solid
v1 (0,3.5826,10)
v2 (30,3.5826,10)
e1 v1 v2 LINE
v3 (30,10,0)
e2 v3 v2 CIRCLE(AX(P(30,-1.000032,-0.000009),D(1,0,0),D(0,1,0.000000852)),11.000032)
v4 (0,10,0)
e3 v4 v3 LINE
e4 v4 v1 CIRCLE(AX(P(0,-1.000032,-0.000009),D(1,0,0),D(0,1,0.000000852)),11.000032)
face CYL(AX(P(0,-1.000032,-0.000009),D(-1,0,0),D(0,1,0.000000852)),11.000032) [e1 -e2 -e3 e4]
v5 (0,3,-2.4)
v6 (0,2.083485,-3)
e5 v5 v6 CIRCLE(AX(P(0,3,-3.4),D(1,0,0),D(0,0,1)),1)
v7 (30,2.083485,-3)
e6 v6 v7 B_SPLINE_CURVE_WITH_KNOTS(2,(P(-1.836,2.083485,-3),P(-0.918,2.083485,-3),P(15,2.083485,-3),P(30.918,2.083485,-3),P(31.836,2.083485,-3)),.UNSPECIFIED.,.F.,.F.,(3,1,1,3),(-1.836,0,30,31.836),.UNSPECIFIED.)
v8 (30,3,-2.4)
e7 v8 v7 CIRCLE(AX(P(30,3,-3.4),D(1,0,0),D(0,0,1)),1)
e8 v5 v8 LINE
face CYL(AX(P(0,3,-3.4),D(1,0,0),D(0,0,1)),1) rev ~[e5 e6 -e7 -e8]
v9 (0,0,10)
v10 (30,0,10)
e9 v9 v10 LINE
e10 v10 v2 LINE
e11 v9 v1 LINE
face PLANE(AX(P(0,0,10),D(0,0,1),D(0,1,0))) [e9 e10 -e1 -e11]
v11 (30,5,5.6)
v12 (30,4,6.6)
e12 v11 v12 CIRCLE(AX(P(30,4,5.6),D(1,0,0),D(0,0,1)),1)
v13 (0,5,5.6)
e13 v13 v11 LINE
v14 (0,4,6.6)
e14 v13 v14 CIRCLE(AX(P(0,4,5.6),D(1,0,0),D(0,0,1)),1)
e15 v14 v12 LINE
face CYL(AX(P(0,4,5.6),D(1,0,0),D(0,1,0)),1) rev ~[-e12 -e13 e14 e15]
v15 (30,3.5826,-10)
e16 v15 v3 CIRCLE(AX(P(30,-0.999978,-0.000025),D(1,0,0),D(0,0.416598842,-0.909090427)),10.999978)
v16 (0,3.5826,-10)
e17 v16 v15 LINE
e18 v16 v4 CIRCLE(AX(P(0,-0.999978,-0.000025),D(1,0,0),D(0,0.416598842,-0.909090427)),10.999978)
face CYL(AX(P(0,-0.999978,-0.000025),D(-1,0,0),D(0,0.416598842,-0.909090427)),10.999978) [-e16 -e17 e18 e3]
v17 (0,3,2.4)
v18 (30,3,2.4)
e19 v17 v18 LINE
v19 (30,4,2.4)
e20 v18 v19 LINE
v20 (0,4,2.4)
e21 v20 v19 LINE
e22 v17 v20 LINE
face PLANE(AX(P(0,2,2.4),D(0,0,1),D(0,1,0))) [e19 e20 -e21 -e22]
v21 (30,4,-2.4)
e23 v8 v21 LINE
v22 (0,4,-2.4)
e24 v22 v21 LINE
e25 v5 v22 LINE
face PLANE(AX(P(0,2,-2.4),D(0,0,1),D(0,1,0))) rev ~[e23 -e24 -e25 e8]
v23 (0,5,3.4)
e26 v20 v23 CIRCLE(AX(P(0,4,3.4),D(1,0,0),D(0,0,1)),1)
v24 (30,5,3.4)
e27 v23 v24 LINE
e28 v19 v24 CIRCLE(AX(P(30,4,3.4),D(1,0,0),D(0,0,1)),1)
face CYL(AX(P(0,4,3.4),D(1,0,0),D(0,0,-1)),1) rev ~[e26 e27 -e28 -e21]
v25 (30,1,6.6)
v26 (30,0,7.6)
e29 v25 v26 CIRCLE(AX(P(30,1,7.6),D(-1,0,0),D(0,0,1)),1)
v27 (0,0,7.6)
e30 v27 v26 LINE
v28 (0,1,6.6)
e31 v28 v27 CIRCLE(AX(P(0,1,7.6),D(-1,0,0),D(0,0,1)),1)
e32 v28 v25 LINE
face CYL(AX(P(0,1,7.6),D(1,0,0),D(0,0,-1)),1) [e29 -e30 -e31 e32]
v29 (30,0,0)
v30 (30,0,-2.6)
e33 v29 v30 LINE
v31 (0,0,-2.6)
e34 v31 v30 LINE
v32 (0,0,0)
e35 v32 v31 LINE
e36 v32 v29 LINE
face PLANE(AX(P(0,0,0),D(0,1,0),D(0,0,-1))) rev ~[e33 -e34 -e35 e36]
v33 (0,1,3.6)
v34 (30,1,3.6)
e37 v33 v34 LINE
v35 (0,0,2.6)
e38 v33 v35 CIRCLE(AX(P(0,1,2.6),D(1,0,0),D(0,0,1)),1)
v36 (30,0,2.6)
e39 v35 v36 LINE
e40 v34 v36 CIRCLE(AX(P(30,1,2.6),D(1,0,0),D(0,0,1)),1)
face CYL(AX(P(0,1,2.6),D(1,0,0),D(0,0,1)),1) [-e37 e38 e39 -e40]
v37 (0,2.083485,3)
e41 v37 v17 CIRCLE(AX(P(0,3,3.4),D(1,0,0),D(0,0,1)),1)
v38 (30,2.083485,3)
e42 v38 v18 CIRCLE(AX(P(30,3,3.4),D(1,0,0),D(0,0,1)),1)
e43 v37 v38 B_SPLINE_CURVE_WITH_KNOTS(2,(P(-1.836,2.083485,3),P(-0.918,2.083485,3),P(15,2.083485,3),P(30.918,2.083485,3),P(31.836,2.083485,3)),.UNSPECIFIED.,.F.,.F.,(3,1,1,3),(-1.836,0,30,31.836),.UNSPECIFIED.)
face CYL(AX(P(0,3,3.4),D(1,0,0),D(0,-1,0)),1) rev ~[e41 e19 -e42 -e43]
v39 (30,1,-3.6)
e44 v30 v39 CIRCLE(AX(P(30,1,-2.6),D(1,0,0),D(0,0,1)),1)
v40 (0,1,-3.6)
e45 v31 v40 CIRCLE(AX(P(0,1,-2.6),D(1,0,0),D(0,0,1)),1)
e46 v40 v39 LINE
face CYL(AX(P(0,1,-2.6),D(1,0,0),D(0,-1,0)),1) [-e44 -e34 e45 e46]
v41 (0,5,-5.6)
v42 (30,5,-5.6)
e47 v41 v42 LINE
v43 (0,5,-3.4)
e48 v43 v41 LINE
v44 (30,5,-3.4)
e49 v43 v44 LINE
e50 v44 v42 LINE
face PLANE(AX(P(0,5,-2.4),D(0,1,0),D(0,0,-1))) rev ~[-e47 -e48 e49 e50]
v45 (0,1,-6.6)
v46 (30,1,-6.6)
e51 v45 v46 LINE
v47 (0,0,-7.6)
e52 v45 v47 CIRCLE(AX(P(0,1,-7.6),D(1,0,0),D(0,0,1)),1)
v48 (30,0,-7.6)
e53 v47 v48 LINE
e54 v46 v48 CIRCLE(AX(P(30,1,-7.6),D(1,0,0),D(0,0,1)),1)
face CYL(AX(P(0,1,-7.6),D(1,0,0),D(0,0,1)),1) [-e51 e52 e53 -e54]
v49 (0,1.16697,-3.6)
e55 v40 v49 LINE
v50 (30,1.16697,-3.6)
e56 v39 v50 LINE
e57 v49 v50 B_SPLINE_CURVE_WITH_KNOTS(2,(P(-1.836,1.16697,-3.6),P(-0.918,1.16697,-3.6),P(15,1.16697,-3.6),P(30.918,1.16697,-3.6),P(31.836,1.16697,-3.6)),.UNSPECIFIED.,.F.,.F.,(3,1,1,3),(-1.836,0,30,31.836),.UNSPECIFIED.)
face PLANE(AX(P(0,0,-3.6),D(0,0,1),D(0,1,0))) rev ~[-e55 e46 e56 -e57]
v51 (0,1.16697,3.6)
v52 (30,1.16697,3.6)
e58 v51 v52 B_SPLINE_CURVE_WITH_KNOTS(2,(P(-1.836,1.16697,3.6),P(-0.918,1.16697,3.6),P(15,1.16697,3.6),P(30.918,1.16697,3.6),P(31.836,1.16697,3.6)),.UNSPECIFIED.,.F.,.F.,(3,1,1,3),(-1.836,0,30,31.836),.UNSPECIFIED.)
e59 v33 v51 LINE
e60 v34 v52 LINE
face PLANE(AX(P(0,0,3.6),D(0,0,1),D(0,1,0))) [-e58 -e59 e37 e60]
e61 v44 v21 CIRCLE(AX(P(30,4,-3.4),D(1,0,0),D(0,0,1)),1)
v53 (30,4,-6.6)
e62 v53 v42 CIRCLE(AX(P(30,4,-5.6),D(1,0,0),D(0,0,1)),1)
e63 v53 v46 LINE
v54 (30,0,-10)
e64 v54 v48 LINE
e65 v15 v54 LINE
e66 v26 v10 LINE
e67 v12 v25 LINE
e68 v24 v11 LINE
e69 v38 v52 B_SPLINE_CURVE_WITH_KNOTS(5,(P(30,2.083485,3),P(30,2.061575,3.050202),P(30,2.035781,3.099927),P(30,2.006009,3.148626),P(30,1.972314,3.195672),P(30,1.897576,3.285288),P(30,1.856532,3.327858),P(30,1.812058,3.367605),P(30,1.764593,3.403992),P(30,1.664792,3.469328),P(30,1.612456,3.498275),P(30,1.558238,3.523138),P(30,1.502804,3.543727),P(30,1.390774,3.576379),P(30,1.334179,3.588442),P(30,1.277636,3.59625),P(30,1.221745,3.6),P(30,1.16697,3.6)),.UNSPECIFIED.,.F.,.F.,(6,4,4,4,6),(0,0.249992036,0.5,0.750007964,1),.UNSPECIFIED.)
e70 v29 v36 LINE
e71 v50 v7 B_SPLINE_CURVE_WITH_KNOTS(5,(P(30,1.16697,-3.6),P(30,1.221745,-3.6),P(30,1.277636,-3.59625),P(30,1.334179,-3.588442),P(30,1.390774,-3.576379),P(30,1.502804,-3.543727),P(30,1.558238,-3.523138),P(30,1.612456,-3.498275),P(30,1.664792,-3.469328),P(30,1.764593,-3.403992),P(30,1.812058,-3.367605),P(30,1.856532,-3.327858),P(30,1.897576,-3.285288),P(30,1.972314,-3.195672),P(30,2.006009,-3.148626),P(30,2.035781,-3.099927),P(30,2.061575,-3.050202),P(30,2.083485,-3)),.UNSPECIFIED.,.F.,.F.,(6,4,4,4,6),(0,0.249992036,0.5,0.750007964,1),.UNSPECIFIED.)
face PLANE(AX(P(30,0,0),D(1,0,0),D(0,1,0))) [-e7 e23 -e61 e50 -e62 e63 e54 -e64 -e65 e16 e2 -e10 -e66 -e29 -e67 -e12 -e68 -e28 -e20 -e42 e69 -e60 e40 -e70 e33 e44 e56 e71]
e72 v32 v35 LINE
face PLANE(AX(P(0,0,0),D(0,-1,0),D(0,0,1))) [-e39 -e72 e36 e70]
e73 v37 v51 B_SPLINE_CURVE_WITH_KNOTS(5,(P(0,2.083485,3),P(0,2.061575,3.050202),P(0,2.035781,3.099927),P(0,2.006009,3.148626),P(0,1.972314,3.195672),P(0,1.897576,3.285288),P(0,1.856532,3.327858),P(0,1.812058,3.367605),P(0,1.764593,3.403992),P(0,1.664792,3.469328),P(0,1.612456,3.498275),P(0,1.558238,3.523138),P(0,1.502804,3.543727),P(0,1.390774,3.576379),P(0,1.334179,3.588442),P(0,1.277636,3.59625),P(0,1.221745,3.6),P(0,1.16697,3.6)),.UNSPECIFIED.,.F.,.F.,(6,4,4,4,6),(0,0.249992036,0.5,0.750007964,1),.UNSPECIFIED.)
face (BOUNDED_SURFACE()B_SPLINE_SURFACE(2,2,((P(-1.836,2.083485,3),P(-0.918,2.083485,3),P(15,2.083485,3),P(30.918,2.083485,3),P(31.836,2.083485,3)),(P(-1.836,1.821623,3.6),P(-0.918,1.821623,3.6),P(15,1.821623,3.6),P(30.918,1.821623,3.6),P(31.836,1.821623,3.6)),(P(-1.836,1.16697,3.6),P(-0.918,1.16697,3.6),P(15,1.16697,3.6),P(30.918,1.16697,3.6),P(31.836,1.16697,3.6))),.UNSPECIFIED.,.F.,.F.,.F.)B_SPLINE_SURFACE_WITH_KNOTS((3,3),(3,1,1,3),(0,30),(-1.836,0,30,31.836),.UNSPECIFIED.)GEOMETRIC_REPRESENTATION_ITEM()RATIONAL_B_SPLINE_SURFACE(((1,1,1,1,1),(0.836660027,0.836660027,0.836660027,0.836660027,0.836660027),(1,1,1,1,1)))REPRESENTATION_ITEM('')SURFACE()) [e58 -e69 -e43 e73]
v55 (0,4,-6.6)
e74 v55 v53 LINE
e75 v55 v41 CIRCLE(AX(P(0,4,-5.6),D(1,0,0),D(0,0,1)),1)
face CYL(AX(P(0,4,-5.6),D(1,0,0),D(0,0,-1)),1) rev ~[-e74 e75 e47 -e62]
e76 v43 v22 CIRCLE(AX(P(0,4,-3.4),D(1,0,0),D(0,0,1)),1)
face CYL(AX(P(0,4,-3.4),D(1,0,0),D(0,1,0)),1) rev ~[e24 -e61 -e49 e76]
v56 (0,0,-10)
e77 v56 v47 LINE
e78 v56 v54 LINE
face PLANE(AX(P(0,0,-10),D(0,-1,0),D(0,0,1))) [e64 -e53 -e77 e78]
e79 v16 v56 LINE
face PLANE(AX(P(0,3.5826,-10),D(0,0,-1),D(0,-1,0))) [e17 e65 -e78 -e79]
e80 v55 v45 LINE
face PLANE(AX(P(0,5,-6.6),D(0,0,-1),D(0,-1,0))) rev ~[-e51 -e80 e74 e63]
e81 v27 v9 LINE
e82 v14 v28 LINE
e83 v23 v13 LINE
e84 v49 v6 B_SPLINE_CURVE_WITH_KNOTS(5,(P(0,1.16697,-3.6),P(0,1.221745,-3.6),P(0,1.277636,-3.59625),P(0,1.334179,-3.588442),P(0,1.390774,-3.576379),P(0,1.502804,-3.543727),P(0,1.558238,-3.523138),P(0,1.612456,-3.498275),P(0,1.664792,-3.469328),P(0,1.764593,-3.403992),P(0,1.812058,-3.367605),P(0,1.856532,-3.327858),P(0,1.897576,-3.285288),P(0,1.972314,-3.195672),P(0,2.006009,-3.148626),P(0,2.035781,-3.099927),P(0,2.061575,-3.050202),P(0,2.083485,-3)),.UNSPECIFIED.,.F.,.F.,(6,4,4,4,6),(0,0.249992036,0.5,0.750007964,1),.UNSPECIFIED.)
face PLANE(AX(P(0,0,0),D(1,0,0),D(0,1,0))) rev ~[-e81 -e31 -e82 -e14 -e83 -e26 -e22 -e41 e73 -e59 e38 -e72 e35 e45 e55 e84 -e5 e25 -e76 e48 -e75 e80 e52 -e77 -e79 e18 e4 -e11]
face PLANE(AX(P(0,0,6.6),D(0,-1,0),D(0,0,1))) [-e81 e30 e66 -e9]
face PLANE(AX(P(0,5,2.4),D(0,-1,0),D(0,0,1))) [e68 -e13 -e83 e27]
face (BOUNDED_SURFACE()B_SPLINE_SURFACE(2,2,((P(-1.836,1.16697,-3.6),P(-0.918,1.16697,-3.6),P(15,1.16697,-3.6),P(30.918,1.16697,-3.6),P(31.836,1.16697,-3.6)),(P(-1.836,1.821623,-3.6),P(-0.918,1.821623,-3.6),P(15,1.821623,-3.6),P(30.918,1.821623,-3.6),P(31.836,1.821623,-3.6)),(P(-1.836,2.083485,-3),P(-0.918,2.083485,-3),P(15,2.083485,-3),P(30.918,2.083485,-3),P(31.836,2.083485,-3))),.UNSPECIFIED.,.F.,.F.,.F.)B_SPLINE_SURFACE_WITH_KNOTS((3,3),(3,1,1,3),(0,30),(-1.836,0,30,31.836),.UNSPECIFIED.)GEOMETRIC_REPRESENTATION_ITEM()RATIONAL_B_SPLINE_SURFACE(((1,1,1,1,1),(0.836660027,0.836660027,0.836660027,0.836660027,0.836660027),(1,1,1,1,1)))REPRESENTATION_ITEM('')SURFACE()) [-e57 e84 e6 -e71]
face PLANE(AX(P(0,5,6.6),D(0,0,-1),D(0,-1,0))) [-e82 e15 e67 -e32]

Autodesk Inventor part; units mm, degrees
ref_plane "YZ Plane" through (0, 0, 0) normal (1, 0, 0) x (0, 1, 0)
ref_plane "XZ Plane" through (0, 0, 0) normal (0, 1, 0) x (-1, 0, 0)
ref_plane "XY Plane" through (0, 0, 0) normal (0, 0, 1) x (1, 0, 0)
sketch "Szkic1" plane through (0, 0, 0) normal (1, 0, 0) x (0, 1, 0)
  line L0 (0, 0) -> (10, 0) construction
  line L1 (0, 0) -> (0, -3.6)
  line L2 (0, -3.6) -> (2, -3.6)
  line L3 (2, -3.6) -> (2, -2.4)
  line L4 (2, -2.4) -> (5, -2.4)
  line L5 (5, -2.4) -> (5, -6.6)
  line L6 (5, -6.6) -> (0, -6.6)
  arc A0 (3.5826, -10) -> (10, 0) centre (-1, 0) ccw
  line L7 (0, 0) -> (0, 3.6)
  line L8 (0, 3.6) -> (2, 3.6)
  line L9 (2, 3.6) -> (2, 2.4)
  line L10 (2, 2.4) -> (5, 2.4)
  line L11 (5, 2.4) -> (5, 6.6)
  line L12 (5, 6.6) -> (0, 6.6)
  arc A1 (10, 0) -> (3.5826, 10) centre (-1, 0) ccw
  line L13 (3.5826, -10) -> (0, -10)
  line L14 (0, -10) -> (0, -6.6)
  line L15 (0, 6.6) -> (0, 10)
  line L16 (0, 10) -> (3.5826, 10)
  dimension "d10" = 3.6
  dimension "d13" = 3
  dimension "d14" = 11
  dimension "d19" = 5
  dimension "d22" = 10
  dimension "d28" = 10
  dimension "d29" = 4.2
  dimension "d32" = 3
  dimension "d34" = 2
extrude "Wyciągnięcie proste1" add sketch "Szkic1" along normal blind 30
fillet "Zaokrąglenie2" radius 1 12 edges at (15, 5, -2.4) (15, 5, -6.6) (15, 2, -3.6) (15, 0, -3.6) (15, 0, 3.6) (15, 2, 3.6) (15, 2, 2.4) (15, 5, 2.4) (15, 5, 6.6) (15, 0, 6.6) (15, 0, -6.6) (15, 2, -2.4)
properties part number "wciskacz_v2" material "PLA"
